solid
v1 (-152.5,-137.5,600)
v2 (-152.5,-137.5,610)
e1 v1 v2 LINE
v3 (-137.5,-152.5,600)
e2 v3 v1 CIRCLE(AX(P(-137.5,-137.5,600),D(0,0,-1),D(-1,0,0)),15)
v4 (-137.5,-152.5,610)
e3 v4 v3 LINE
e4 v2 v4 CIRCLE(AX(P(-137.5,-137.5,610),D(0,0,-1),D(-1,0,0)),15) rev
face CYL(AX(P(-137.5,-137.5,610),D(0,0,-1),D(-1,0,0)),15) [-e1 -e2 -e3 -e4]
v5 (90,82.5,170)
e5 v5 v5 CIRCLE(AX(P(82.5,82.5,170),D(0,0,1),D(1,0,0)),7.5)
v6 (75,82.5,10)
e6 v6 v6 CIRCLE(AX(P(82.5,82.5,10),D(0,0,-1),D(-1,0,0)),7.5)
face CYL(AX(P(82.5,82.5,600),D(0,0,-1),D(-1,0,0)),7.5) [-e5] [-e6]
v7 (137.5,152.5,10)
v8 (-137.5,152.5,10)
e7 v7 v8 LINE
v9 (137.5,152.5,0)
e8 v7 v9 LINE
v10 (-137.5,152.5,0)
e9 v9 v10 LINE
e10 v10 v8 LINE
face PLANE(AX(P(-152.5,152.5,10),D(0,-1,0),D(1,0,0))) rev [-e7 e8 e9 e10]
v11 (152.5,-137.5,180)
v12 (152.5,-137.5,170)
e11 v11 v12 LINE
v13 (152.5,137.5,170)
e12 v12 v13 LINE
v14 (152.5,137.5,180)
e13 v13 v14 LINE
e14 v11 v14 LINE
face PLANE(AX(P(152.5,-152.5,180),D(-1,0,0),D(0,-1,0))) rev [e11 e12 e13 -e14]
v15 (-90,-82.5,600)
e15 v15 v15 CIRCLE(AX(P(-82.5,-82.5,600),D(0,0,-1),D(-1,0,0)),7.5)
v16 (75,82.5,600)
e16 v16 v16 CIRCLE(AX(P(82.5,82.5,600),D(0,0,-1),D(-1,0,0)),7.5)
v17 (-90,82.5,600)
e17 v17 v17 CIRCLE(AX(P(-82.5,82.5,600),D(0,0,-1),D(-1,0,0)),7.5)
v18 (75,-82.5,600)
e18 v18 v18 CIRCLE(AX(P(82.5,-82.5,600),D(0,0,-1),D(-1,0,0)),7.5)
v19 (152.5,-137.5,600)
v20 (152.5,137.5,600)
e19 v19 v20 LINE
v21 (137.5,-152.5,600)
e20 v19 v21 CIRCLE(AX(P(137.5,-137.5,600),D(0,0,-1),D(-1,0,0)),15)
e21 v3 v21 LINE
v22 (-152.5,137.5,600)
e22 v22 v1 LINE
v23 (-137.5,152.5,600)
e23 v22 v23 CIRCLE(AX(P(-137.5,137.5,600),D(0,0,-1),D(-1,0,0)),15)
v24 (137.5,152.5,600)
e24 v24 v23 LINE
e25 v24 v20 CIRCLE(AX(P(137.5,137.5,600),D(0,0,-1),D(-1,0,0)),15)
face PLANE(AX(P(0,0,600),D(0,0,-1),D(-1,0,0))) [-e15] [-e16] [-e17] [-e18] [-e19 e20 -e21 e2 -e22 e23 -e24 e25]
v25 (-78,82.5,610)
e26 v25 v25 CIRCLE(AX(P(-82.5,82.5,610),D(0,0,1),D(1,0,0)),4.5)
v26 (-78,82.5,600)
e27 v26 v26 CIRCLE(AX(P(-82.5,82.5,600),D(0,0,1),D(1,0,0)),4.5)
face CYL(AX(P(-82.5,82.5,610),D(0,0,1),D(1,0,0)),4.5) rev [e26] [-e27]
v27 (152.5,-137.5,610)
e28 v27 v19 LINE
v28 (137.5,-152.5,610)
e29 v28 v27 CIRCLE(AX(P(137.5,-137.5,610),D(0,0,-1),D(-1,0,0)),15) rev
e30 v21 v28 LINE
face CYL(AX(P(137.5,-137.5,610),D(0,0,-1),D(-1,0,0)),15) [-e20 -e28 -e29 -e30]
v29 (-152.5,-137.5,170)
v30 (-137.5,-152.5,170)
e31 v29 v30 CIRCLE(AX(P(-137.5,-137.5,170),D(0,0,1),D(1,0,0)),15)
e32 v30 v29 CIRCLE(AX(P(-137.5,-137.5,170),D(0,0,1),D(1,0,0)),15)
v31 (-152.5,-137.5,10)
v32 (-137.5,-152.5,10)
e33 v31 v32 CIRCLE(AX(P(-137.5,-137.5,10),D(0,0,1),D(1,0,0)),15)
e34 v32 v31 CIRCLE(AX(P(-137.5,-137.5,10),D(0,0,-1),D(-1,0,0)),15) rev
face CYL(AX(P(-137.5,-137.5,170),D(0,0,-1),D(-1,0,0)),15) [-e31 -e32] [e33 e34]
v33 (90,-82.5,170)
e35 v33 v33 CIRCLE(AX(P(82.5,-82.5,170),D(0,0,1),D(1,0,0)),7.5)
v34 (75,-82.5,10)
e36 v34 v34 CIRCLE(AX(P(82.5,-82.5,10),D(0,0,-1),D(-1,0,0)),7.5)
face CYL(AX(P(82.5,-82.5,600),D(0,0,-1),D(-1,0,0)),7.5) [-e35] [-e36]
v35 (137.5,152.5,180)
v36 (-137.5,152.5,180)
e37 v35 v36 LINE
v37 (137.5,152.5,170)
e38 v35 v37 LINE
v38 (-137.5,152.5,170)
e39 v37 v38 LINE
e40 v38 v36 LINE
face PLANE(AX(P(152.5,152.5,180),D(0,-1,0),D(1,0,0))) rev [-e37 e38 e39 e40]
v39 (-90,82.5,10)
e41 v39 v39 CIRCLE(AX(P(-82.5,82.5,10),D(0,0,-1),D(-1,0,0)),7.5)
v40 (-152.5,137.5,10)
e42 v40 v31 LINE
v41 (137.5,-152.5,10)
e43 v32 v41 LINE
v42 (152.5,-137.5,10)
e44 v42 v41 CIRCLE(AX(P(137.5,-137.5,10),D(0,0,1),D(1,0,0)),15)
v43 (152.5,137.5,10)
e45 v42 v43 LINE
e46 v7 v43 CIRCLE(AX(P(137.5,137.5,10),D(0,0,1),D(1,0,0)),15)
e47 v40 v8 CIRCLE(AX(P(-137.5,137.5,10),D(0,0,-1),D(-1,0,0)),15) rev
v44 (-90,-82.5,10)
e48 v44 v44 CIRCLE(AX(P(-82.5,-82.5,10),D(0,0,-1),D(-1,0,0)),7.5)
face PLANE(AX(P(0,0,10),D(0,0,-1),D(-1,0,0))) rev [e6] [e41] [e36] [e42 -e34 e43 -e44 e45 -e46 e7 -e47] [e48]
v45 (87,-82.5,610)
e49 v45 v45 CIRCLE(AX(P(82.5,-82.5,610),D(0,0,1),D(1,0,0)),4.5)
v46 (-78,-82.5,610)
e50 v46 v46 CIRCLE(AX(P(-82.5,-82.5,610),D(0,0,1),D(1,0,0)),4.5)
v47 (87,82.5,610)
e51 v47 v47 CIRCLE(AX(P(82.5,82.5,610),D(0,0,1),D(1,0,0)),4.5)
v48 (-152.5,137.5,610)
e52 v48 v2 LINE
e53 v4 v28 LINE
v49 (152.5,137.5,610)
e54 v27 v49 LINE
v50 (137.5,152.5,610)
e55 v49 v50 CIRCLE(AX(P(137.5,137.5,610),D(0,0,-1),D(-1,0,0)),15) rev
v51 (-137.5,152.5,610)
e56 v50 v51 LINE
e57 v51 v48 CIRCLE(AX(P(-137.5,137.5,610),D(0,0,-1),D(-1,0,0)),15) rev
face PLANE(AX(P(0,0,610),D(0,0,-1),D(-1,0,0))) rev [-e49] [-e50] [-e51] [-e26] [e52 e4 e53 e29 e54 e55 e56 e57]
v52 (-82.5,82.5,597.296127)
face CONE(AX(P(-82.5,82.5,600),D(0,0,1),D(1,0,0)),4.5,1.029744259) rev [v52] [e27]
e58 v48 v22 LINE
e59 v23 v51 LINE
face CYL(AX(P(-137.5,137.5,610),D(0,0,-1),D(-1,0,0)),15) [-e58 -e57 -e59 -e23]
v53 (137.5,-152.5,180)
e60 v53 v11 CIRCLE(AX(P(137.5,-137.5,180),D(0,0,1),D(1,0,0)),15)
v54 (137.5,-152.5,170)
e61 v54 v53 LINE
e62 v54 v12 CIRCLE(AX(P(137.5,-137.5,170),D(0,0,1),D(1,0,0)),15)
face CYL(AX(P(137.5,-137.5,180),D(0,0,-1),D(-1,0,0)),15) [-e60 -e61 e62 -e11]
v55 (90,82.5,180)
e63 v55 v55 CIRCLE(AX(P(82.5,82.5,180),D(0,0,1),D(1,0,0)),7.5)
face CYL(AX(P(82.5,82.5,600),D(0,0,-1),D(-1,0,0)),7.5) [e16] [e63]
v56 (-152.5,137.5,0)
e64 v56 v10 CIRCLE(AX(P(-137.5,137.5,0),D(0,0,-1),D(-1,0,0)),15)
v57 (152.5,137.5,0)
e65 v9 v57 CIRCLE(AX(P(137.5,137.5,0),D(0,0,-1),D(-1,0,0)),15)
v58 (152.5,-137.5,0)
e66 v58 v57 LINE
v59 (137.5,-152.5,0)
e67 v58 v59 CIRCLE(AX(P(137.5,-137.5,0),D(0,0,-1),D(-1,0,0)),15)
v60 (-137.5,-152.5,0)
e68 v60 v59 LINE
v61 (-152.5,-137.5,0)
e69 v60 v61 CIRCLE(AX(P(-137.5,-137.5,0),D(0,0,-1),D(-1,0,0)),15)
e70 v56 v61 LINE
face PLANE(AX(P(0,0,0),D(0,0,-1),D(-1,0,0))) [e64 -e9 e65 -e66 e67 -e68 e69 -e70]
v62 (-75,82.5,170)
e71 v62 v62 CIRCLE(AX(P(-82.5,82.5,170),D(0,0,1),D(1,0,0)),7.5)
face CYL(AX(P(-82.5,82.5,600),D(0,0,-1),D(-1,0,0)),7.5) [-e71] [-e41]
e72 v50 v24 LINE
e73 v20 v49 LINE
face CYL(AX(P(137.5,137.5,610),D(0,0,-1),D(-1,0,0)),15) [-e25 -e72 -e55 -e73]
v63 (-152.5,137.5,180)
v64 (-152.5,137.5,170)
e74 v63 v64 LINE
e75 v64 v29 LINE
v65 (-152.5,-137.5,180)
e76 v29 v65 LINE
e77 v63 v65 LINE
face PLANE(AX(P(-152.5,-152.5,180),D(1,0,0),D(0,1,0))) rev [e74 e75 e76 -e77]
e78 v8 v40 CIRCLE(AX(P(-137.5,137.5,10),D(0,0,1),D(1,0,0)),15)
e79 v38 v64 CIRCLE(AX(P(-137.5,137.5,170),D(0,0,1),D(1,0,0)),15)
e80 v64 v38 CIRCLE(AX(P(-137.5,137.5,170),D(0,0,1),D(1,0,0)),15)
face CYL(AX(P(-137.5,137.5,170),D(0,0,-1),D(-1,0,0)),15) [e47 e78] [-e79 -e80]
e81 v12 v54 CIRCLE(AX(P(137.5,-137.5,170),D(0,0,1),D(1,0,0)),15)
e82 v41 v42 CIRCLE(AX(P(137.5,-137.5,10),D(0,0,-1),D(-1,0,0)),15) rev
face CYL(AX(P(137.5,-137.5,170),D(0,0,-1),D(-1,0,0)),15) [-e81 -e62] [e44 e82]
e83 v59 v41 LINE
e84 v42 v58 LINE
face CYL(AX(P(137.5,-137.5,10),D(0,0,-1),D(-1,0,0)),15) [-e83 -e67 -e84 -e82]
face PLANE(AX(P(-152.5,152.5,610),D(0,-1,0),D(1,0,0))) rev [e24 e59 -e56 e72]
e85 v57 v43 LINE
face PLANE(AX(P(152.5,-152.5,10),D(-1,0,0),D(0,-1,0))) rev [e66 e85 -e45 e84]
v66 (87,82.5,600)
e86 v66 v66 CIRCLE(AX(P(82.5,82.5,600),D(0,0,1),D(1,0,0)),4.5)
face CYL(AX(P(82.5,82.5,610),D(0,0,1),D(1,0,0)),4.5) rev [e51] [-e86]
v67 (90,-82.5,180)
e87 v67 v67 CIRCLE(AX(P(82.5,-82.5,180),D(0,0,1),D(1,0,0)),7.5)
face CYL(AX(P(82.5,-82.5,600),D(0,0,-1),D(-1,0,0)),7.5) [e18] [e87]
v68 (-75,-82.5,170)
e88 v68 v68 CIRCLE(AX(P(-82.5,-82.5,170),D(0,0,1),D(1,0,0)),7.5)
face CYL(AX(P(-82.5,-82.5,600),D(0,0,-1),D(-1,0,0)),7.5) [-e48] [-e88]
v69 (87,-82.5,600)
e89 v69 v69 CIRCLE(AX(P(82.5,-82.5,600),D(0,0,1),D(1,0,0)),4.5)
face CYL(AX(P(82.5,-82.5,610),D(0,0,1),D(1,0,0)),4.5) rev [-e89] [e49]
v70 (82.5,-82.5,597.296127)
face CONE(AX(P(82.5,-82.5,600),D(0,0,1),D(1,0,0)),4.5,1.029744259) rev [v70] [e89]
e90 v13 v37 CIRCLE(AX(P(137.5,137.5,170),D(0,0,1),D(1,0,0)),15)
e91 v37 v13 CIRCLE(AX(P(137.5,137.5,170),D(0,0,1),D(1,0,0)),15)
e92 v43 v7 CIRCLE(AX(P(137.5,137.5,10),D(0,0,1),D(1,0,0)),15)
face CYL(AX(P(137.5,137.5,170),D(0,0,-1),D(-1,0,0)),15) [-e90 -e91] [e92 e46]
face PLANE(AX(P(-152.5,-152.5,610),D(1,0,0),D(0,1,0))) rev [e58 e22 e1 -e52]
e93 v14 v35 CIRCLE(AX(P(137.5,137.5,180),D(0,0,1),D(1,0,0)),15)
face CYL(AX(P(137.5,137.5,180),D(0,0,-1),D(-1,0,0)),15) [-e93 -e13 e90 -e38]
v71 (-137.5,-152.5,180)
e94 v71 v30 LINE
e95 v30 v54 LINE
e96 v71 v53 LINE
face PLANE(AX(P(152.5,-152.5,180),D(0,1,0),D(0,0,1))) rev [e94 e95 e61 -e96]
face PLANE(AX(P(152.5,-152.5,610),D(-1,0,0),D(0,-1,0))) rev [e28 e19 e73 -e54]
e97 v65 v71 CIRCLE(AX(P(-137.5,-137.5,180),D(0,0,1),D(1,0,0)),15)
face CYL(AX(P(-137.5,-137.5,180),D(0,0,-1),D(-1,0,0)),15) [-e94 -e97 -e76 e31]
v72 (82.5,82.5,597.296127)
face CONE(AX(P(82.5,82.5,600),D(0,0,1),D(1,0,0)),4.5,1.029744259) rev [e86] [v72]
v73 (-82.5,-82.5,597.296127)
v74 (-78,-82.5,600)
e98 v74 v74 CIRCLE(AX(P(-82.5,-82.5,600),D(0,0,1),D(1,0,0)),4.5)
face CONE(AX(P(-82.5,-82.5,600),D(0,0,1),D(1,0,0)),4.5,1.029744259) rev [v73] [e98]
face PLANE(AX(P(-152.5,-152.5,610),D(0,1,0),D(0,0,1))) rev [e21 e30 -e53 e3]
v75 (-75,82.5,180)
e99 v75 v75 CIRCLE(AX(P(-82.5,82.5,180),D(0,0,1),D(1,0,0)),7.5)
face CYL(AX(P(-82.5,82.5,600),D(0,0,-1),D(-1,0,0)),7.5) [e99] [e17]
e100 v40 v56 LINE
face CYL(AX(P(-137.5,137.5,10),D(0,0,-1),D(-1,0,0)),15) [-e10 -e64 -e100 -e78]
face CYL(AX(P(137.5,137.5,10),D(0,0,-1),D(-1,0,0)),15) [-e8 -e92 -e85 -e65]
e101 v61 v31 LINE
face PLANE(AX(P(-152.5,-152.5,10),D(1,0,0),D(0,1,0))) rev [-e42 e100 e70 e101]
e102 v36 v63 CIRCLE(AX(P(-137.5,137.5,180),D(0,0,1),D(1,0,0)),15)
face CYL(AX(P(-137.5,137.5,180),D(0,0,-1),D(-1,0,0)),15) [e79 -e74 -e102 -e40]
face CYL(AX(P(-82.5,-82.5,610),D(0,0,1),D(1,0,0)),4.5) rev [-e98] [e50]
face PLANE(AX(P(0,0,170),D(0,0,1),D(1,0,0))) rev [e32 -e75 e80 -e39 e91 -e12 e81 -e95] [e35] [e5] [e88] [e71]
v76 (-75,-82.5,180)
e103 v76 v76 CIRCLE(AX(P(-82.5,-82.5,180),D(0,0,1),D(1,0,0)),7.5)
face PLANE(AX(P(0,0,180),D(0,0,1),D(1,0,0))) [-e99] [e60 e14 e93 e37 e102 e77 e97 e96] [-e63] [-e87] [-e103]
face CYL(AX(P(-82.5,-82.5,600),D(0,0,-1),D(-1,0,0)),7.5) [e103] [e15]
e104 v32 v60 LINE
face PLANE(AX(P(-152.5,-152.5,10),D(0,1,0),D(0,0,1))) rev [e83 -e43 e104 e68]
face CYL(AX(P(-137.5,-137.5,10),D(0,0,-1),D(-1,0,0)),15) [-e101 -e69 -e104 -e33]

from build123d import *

# Parameters (mm, degrees)
ESQUISSE1_W             = 305
ESQUISSE1_H             = 305
BOSS_EXTRU_1_DEPTH      = 10
ESQUISSE2_R             = 15
BOSS_EXTRU_2_DEPTH      = 160
ESQUISSE3_W             = 305
ESQUISSE3_H             = 305
BOSS_EXTRU_3_DEPTH      = 10
ESQUISSE4_R             = 7.5
ENL_V_MAT_EXTRU_1_DEPTH = 281.913687812
BOSS_EXTRU_4_START      = -600
ESQUISSE5_R             = 7.5
BOSS_EXTRU_4_DEPTH      = 600
ESQUISSE7_W             = 305
ESQUISSE7_H             = 305
BOSS_EXTRU_5_DEPTH      = 10
D_GAGEMENT_M81_D        = 9
D_GAGEMENT_M81_DEPTH    = 10
D_GAGEMENT_M81_TIP      = 2.703872786
CONG_1_R                = 15


with BuildPart() as part:
    # Esquisse1 → Boss.-Extru.1 (new body)
    with BuildSketch(Plane.XY):
        Rectangle(ESQUISSE1_W, ESQUISSE1_H)
    extrude(amount=BOSS_EXTRU_1_DEPTH)

    # Esquisse2 → Boss.-Extru.2 (add)
    with BuildSketch(Plane.XY.offset(10)):
        with Locations((137.5, 137.5)):
            Circle(ESQUISSE2_R)
        with Locations((137.5, -137.5)):
            Circle(ESQUISSE2_R)
        with Locations(Location((-137.5, -137.5, 0), (0, 0, 180))):
            Circle(ESQUISSE2_R)
        with Locations(Location((-137.5, 137.5, 0), (0, 0, 180))):
            Circle(ESQUISSE2_R)
    extrude(amount=BOSS_EXTRU_2_DEPTH)

    # Esquisse3 → Boss.-Extru.3 (add)
    with BuildSketch(Plane.XY.offset(170)):
        Rectangle(ESQUISSE3_W, ESQUISSE3_H)
    extrude(amount=BOSS_EXTRU_3_DEPTH)

    # Esquisse4 → Enlèv. mat.-Extru.1 (cut, through all)
    with BuildSketch(Plane.XY.offset(180)):
        with Locations((82.5, -82.5)):
            Circle(ESQUISSE4_R)
        with Locations((-82.5, -82.5)):
            Circle(ESQUISSE4_R)
        with Locations((82.5, 82.5)):
            Circle(ESQUISSE4_R)
        with Locations((-82.5, 82.5)):
            Circle(ESQUISSE4_R)
    extrude(amount=-ENL_V_MAT_EXTRU_1_DEPTH, mode=Mode.SUBTRACT)

    # Esquisse5 → Boss.-Extru.4 (add)
    with BuildSketch(Plane(origin=(0, 0, 0), x_dir=(-1, 0, 0), z_dir=(0, 0, -1)).offset(BOSS_EXTRU_4_START)):
        with Locations((-82.5, 82.5)):
            Circle(ESQUISSE5_R)
        with Locations((82.5, 82.5)):
            Circle(ESQUISSE5_R)
        with Locations((82.5, -82.5)):
            Circle(ESQUISSE5_R)
        with Locations((-82.5, -82.5)):
            Circle(ESQUISSE5_R)
    extrude(amount=BOSS_EXTRU_4_DEPTH)

    # Esquisse7 → Boss.-Extru.5 (add)
    with BuildSketch(Plane.XY.offset(600)):
        Rectangle(ESQUISSE7_W, ESQUISSE7_H)
    extrude(amount=BOSS_EXTRU_5_DEPTH)

    # Dégagement M81
    with Locations(Plane(origin=(82.5, -82.5, 610), x_dir=(1, 0, 0), z_dir=(0, 0, 1))):
        with Locations((0, 0), (0, 165), (-165, 165), (-165, 0)):
            Hole(D_GAGEMENT_M81_D / 2, depth=D_GAGEMENT_M81_DEPTH)
            with Locations((0, 0, -(D_GAGEMENT_M81_DEPTH + D_GAGEMENT_M81_TIP / 2))):  # 118° drill point
                Cone(0, D_GAGEMENT_M81_D / 2, D_GAGEMENT_M81_TIP, mode=Mode.SUBTRACT)

    # Congé1
    cong_1_edges = [part.edges().sort_by_distance(p)[0] for p in [
        (-152.5, 152.5, 605),
        (-152.5, 152.5, 175),
        (-152.5, 152.5, 5),
        (-152.5, -152.5, 5),
        (-152.5, -152.5, 175),
        (-152.5, -152.5, 605),
        (152.5, -152.5, 605),
        (152.5, -152.5, 175),
        (152.5, -152.5, 5),
        (152.5, 152.5, 5),
        (152.5, 152.5, 175),
        (152.5, 152.5, 605),
    ]]
    fillet(cong_1_edges, radius=CONG_1_R - 0.0001)  # a hair under: the kernel refuses the full size


solid = part.part
